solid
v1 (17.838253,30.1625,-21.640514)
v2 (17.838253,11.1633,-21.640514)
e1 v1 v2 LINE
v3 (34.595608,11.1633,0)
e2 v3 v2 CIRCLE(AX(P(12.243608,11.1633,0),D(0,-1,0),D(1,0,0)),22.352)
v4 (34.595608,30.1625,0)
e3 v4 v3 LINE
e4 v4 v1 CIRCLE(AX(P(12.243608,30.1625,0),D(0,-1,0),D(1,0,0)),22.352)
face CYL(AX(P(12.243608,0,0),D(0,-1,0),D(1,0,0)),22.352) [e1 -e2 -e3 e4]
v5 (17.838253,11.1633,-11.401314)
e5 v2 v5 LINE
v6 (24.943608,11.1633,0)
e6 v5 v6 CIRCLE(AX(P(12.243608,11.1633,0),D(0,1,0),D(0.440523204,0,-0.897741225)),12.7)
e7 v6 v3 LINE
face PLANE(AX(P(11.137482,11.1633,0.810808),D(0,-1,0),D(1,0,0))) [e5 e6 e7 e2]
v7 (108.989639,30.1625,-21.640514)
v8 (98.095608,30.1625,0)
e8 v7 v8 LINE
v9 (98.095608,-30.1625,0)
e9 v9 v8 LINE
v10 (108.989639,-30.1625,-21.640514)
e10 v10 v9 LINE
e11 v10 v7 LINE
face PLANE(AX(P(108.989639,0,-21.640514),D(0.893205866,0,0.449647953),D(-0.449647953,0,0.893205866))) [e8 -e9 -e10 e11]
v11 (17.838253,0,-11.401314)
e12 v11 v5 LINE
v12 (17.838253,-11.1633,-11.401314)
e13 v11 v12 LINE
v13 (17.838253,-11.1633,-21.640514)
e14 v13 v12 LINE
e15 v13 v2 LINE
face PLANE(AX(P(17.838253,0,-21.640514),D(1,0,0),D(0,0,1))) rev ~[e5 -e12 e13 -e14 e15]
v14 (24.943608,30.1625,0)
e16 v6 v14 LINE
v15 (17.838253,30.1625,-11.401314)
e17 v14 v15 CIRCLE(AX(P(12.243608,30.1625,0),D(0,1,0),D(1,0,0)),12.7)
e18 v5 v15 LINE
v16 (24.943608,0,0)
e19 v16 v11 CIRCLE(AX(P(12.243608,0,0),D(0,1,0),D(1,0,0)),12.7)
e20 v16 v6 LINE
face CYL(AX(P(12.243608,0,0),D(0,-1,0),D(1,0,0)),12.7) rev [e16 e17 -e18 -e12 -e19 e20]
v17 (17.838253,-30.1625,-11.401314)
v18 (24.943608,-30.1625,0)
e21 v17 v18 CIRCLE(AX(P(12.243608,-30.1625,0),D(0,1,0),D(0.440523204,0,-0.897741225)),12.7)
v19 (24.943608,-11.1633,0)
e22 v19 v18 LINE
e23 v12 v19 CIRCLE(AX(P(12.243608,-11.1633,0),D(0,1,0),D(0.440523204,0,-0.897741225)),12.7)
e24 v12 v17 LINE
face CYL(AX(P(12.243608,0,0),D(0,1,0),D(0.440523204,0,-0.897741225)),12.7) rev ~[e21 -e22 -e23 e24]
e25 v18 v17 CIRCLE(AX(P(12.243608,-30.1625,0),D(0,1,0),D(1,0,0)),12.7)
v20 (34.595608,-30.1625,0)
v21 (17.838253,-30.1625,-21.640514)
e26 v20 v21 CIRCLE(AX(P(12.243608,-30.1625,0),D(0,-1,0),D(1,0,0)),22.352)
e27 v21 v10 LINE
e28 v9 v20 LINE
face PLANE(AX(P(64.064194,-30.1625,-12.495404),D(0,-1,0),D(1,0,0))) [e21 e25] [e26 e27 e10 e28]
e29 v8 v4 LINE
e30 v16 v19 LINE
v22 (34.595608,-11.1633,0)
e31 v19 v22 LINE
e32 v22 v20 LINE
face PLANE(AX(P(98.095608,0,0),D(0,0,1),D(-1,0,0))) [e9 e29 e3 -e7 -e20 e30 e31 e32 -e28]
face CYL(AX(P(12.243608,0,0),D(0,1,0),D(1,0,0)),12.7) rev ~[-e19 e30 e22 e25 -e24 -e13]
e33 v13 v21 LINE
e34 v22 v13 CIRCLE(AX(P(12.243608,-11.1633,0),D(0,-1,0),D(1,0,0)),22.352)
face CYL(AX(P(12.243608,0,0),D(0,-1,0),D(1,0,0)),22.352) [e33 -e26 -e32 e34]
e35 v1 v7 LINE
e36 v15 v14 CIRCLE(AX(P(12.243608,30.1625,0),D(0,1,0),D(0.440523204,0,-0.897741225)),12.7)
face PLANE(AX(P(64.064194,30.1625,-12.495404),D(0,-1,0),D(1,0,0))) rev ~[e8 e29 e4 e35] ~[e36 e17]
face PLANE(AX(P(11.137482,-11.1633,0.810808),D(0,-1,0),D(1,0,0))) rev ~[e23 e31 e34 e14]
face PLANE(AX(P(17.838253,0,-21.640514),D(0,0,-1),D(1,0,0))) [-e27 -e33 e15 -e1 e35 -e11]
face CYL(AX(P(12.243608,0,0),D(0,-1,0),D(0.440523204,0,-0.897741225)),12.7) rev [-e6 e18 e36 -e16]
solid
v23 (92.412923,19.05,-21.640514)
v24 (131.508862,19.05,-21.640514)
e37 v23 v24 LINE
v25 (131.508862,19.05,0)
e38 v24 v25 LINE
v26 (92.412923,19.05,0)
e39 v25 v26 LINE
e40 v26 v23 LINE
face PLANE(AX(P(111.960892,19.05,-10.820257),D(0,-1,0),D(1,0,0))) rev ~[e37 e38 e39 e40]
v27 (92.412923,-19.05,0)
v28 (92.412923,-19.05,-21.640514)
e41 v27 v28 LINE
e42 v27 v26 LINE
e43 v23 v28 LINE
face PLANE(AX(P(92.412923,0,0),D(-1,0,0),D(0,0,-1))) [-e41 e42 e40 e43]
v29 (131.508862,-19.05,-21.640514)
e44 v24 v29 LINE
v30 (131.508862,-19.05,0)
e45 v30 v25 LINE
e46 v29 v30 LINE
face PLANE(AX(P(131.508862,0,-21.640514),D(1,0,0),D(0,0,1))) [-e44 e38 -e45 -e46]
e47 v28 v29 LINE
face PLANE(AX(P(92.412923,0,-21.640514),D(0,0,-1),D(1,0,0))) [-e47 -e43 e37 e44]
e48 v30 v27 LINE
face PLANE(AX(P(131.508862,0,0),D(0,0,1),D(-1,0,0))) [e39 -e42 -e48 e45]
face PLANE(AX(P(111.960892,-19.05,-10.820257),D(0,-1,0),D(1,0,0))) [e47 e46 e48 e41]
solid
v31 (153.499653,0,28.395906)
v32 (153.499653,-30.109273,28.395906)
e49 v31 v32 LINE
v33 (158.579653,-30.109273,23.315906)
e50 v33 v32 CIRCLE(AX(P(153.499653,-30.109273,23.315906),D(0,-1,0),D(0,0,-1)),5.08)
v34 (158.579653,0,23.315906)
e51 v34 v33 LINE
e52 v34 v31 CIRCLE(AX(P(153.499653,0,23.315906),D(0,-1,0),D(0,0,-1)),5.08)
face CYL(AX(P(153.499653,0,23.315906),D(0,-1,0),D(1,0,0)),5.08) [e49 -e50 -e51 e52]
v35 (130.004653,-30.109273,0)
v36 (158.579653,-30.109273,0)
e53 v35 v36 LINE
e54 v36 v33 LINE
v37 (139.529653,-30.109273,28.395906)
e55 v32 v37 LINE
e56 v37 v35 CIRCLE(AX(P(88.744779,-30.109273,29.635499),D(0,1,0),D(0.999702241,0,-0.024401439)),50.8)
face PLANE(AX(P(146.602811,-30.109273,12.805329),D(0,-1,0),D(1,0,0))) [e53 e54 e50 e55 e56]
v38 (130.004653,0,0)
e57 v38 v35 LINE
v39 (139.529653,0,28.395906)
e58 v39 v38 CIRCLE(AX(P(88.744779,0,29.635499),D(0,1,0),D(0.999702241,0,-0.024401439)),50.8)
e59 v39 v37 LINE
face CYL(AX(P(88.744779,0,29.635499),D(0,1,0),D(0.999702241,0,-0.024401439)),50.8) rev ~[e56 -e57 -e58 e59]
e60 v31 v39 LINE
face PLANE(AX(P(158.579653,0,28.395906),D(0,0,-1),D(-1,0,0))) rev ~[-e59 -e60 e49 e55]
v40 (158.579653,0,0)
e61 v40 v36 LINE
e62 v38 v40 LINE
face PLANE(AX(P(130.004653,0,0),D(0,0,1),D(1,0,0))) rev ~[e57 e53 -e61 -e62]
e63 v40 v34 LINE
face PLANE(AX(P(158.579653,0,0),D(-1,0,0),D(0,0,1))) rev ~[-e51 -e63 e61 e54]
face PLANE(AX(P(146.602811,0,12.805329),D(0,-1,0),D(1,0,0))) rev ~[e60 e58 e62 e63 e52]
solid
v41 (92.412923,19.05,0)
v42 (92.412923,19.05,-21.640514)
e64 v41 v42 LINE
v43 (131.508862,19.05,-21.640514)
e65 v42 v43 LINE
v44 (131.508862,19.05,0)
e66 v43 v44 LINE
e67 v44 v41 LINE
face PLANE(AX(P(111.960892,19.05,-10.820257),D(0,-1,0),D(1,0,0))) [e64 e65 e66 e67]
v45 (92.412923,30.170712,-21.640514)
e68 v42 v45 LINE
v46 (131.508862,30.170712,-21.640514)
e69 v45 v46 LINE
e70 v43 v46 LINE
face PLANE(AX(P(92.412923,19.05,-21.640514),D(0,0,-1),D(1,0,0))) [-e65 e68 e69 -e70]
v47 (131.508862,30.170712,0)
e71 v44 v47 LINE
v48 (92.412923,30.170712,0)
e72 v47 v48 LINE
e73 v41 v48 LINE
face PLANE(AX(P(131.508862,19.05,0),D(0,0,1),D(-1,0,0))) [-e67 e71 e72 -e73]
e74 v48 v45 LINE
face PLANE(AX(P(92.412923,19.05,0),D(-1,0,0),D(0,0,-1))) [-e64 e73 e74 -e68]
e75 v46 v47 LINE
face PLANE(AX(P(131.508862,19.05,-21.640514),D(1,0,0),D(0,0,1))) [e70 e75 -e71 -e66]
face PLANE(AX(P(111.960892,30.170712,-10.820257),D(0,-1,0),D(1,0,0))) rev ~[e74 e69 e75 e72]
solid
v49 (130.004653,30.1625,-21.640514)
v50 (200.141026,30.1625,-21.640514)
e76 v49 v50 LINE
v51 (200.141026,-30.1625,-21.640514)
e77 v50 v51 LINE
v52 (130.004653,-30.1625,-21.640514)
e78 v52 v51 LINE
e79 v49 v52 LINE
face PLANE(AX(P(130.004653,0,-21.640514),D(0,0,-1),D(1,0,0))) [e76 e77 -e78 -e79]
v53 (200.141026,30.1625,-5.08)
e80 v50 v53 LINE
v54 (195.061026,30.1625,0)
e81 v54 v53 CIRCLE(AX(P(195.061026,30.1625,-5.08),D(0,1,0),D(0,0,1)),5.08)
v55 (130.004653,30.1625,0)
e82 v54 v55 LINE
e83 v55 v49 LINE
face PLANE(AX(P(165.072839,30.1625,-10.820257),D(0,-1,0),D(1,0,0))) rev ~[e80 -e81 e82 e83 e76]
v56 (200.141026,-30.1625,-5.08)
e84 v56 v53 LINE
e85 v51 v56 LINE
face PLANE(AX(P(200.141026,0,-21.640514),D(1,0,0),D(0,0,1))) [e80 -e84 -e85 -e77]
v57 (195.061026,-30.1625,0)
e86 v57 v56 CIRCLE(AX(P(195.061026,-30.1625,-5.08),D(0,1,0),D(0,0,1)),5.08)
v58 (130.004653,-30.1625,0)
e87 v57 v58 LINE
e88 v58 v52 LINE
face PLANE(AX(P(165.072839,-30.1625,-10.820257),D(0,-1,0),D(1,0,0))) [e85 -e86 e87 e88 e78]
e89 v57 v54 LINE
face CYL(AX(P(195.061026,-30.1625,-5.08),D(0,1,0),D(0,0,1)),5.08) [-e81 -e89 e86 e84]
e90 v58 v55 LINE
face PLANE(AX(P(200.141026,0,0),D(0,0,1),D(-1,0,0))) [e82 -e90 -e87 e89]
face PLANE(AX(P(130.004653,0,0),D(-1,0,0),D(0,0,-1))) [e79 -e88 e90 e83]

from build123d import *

# Parameters (mm, degrees)
F1_DEPTH = 30.1625
F3_DEPTH = 19.05
F4_R     = 5.08
F5_DEPTH = 30.1092732698
F6_R     = 5.08
F7_DEPTH = 11.1207123846
F8_DEPTH = 11.1633


# Not quite as in the source:
# - a feature names something its author has since deleted; it is built from what else it names


with BuildPart() as f1:
    # F0 (on Front) → F1 (new body, symmetric)
    with BuildSketch(Plane.XZ):
        with BuildLine():
            Line((98.0956078965, 0), (34.5956078965, 0))
            ThreePointArc((34.5956078965, 0), (29.9165165739, -13.6850357282), (17.838252592, -21.6405141975))
            Line((17.838252592, -21.6405141975), (108.9896394755, -21.6405141975))
            Line((108.9896394755, -21.6405141975), (98.0956078965, 0))
        make_face()
        with BuildLine():
            Line((34.5956078965, 0), (24.9436078965, 0))
            ThreePointArc((24.9436078965, 0), (23.0218727762, -6.7170682729), (17.838252592, -11.4013135529))
            Line((17.838252592, -11.4013135529), (17.838252592, -21.6405141975))
            ThreePointArc((17.838252592, -21.6405141975), (29.9165165739, -13.6850357282), (34.5956078965, 0))
        make_face()
        with BuildLine():
            ThreePointArc((17.838252592, -11.4013135529), (1.4653430168, 6.7170682729), (24.9436078965, 0))
            Line((24.9436078965, 0), (34.5956078965, 0))
            ThreePointArc((34.5956078965, 0), (-5.4293007808, 13.6850357282), (17.838252592, -21.6405141975))
            Line((17.838252592, -21.6405141975), (17.838252592, -11.4013135529))
        make_face()
    extrude(amount=F1_DEPTH, both=True)

    # F0 (on Front) → F8 (cut, symmetric)
    with BuildSketch(Plane.XZ):
        with BuildLine():
            ThreePointArc((17.838252592, -11.4013135529), (1.4653430168, 6.7170682729), (24.9436078965, 0))
            Line((24.9436078965, 0), (34.5956078965, 0))
            ThreePointArc((34.5956078965, 0), (-5.4293007808, 13.6850357282), (17.838252592, -21.6405141975))
            Line((17.838252592, -21.6405141975), (17.838252592, -11.4013135529))
        make_face()
    extrude(amount=F8_DEPTH, both=True, mode=Mode.SUBTRACT)


with BuildPart() as f1b:
    # F0 (on Front) → F1, piece 2 (new body, symmetric)
    with BuildSketch(Plane.XZ):
        Polygon((130.004652592, 0), (130.004652592, -21.6405141975), (200.1410263589, -21.6405141975), (200.1410263589, 0), (158.579652592, 0), align=None)
    extrude(amount=F1_DEPTH, both=True)

    # F4
    f4_edges = [f1b.edges().sort_by_distance(p)[0] for p in [
        (200.141026, 0, 0),
    ]]
    fillet(f4_edges, radius=F4_R)


with BuildPart() as f3:
    # F2 (on Front) → F3 (new body, symmetric)
    with BuildSketch(Plane.XZ):
        Polygon((131.5081966538, 0), (92.4129226052, 0), (92.4129226052, -21.6405141975), (131.5088617504, -21.6405141975), (131.5088617504, 0), align=None)
    extrude(amount=F3_DEPTH, both=True)


with BuildPart() as f5:
    # F0 (on Front) → F5 (new body)
    with BuildSketch(Plane.XZ):
        with BuildLine():
            ThreePointArc((139.529652592, 28.3959060907), (136.9074278137, 13.4800283762), (130.004652592, 0))
            Line((130.004652592, 0), (158.579652592, 0))
            Line((158.579652592, 0), (158.579652592, 28.3959060907))
            Line((158.579652592, 28.3959060907), (139.529652592, 28.3959060907))
        make_face()
    extrude(amount=F5_DEPTH)

    # F6
    f6_edges = [f5.edges().sort_by_distance(p)[0] for p in [
        (158.579653, -15.054637, 28.395906),
    ]]
    fillet(f6_edges, radius=F6_R)


with BuildPart() as f7:
    # F7 (new): a face of the model
    f7_faces = [f3.part.faces().sort_by_distance(p)[0] for p in [
        (111.9608921778, 19.05, -10.8202570987),
    ]]
    extrude(f7_faces, amount=F7_DEPTH)


solid = Compound([f1.part, f1b.part, f3.part, f5.part, f7.part])
